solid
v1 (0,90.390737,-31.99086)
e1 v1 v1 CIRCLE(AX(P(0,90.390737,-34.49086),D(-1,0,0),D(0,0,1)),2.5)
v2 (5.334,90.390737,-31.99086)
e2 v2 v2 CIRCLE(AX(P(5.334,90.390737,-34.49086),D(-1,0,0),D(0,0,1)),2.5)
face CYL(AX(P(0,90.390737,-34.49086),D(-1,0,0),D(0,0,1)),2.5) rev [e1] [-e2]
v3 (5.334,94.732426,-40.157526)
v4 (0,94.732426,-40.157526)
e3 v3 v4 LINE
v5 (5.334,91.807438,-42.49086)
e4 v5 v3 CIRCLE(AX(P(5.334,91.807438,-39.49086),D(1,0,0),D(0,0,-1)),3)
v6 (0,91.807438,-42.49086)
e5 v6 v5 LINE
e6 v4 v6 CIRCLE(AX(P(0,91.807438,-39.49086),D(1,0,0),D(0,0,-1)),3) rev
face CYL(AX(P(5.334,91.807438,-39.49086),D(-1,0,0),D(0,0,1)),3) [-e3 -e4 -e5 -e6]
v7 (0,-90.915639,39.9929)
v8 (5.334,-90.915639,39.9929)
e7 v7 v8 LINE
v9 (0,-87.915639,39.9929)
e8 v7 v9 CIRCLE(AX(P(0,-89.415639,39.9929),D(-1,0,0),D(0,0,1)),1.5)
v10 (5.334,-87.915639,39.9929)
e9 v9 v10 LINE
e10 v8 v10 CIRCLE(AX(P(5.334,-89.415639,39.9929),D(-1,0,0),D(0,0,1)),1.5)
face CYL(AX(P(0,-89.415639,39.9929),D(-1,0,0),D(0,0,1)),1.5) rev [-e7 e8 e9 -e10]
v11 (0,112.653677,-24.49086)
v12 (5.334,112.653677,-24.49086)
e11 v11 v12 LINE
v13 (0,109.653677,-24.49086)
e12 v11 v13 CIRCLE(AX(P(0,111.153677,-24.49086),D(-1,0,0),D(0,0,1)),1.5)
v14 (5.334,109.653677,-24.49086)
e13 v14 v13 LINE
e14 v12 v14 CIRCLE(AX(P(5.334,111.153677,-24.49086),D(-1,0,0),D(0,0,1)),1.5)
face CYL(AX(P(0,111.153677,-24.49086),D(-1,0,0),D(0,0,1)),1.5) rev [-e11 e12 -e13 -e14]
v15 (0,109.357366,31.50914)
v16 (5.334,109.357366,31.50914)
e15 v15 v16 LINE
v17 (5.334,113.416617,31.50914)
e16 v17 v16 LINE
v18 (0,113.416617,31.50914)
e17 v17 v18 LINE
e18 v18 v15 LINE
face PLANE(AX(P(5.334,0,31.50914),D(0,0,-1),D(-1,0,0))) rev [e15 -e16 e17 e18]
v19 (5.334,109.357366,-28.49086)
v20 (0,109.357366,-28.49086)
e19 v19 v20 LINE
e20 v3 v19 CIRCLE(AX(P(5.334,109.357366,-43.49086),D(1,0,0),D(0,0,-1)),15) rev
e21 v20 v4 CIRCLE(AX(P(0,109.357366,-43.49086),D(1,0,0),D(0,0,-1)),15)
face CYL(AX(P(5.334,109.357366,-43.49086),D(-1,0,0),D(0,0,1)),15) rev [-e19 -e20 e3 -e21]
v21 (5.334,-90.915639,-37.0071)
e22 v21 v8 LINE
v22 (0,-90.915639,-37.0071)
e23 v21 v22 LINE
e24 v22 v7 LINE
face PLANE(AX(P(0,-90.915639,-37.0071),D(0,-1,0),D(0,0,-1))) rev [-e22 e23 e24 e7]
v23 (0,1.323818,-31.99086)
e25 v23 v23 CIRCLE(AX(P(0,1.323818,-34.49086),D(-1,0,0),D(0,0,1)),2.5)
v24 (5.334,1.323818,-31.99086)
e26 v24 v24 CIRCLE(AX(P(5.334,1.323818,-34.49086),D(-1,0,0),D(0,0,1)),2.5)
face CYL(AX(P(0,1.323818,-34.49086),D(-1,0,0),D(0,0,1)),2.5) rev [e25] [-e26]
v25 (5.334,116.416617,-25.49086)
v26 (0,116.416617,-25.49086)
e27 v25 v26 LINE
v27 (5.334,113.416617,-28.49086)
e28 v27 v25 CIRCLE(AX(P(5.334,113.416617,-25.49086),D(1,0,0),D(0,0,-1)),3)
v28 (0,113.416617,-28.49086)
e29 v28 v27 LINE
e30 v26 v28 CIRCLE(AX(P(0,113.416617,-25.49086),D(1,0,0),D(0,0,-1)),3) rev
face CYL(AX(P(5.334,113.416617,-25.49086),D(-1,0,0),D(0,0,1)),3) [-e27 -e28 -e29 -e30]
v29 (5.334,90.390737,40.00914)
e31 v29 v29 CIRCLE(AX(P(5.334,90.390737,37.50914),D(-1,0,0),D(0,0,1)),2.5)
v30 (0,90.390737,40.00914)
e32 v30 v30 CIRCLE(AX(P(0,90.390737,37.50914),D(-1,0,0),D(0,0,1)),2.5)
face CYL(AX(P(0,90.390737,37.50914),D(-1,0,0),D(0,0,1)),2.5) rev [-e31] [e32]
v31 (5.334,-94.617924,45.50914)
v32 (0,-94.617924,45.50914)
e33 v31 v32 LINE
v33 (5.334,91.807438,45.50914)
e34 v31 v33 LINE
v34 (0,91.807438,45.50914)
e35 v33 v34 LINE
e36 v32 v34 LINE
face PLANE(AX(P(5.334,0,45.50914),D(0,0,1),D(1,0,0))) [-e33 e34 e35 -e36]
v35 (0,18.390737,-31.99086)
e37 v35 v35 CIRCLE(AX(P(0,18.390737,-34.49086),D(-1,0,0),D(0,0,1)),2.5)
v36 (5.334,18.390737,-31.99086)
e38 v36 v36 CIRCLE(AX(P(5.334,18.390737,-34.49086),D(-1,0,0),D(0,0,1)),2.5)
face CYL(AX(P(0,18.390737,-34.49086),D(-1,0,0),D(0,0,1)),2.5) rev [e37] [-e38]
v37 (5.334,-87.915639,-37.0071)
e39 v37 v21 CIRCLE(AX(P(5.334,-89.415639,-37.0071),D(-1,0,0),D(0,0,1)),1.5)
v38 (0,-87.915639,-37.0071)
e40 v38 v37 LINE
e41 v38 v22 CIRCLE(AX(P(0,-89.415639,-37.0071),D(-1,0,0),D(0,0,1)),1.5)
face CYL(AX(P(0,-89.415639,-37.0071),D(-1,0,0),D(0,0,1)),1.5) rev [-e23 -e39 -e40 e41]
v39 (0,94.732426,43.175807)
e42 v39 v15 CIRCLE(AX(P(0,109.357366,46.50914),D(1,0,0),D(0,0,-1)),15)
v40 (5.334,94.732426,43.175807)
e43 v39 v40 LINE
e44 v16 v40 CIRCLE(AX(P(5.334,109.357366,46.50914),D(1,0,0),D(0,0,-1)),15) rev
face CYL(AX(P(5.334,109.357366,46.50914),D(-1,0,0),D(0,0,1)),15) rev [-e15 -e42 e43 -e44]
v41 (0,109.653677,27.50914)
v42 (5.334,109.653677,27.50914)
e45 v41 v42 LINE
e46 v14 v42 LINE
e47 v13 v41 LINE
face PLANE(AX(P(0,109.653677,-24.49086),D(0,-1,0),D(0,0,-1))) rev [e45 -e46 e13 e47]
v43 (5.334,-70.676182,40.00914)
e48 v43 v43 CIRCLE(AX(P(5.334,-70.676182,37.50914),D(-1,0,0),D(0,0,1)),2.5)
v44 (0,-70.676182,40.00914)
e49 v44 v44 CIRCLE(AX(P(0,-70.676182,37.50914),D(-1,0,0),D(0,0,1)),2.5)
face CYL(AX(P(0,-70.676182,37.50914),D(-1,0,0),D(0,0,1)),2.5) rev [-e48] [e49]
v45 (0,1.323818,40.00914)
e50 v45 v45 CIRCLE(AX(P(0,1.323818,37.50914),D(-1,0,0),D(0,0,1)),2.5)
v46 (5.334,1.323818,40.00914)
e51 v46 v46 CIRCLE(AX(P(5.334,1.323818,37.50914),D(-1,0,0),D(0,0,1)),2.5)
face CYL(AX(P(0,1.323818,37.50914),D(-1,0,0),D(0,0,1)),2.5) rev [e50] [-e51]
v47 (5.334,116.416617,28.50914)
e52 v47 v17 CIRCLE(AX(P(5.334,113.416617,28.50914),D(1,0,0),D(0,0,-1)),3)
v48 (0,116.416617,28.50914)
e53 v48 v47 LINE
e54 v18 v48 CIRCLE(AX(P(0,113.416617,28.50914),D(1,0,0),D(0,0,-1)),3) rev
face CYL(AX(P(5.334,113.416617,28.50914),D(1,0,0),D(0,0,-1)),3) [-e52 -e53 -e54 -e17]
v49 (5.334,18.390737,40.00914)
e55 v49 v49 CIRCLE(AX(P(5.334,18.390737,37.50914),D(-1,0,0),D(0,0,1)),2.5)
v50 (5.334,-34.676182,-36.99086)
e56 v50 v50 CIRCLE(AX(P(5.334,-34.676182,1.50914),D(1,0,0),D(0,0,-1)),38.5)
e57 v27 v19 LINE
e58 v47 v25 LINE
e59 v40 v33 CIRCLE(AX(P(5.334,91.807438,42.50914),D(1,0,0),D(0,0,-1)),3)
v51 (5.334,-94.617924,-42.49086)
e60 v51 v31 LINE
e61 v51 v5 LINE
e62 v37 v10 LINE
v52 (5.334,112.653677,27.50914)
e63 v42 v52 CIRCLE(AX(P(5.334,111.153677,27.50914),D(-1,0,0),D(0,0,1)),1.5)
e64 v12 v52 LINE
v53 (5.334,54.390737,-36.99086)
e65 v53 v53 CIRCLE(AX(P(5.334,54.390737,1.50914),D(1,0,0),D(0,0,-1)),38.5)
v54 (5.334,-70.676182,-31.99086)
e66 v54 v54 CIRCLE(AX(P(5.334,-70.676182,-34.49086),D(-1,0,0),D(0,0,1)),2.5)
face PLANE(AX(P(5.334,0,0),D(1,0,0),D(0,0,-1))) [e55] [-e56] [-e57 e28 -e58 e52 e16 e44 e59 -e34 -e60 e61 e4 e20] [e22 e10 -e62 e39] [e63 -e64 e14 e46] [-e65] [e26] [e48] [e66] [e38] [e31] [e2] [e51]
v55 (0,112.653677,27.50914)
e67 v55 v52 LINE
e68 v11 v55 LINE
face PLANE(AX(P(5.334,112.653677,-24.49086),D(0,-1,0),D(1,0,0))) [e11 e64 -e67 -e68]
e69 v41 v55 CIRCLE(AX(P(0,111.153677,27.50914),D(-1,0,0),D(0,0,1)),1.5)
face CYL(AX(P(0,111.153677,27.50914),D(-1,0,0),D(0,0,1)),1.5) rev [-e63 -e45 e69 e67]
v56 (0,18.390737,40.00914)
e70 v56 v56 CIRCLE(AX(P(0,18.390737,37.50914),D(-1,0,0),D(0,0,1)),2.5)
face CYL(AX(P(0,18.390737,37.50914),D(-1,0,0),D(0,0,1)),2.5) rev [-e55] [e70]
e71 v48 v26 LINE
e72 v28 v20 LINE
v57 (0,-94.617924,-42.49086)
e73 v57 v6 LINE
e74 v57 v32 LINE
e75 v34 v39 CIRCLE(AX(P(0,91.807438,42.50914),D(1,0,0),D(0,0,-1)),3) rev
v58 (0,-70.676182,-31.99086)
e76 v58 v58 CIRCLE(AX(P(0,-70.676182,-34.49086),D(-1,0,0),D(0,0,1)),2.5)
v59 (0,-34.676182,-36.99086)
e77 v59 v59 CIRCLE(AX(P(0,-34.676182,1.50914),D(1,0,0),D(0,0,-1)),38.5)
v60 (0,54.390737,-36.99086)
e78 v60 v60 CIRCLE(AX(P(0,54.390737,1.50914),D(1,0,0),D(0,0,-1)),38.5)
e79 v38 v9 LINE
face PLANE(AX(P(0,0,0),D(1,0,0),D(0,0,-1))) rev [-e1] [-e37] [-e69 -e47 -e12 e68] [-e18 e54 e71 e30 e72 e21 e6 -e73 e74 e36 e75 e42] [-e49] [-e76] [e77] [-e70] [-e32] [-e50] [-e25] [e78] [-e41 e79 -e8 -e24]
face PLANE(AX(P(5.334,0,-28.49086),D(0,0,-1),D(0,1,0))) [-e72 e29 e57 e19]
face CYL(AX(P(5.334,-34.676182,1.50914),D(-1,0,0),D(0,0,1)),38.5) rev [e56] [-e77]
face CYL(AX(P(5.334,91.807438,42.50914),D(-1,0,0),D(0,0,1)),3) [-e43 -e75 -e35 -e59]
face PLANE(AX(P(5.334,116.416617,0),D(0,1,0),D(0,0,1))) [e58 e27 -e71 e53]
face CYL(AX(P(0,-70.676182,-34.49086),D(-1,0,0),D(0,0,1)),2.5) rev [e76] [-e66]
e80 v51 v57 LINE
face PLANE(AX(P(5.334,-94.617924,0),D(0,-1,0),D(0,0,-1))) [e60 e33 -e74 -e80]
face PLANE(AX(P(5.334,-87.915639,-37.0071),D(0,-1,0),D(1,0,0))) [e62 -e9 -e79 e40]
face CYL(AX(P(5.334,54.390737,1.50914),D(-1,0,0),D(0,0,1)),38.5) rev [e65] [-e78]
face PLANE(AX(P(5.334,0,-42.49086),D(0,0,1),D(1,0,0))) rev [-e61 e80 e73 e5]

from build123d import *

# Parameters (mm, degrees)
SKETCH2_R                 = 38.5
SKETCH2_W                 = 4
SKETCH2_H                 = 189.008661332
BOSS_EXTRUDE2_DEPTH       = 5.334
F_3_0MM_DOWEL_SLOT1_DEPTH = 5.334
F_3_0MM_DOWEL_SLOT2_DEPTH = 5.334
FILLET1_R                 = 15
FILLET2_R                 = 3
F_5_0MM_DOWEL_HOLE1_D     = 5


# Read off the part's stored shape, not the designer's step: Ø3.0mm Dowel Slot1, Ø3.0mm Dowel Slot2
with BuildPart() as part:
    # Sketch2 → Boss-Extrude2 (new body)
    # profile 1 of 3: a face of its own
    with BuildSketch(Plane(origin=(0, 0, 0), x_dir=(0, 0, -1), z_dir=(1, 0, 0))):
        Polygon((28.490859753, 116.416616863), (28.490859753, 94.390736923), (38.490859753, 94.390736923), (38.490859753, -94.617924409), (-41.509140247, -94.617924409), (-41.509140247, 94.390736923), (-31.509140247, 94.390736923), (-31.509140247, 116.416616863), align=None)
        with Locations((-1.509140247, 54.390736923)):
            Circle(SKETCH2_R, mode=Mode.SUBTRACT)
        with Locations((-1.509140247, -34.676182382)):
            Circle(SKETCH2_R, mode=Mode.SUBTRACT)
    # profile 2 of 3: a face of its own
    with BuildSketch(Plane(origin=(0, 0, 0), x_dir=(0, 0, -1), z_dir=(1, 0, 0))):
        with Locations((-43.509140247, -0.113593743)):
            Rectangle(SKETCH2_W, SKETCH2_H)
    # profile 3 of 3: a face of its own
    with BuildSketch(Plane(origin=(0, 0, 0), x_dir=(0, 0, -1), z_dir=(1, 0, 0))):
        with Locations((40.490859753, -0.113593743)):
            Rectangle(SKETCH2_W, SKETCH2_H)
    extrude(amount=BOSS_EXTRUDE2_DEPTH)

    # Ø3.0mm Dowel Slot1 outline → Ø3.0mm Dowel Slot1 (cut)
    with BuildSketch(Plane.YZ):
        with BuildLine():
            ThreePointArc((-87.91563933, 39.992900247), (-89.41563933, 41.492900247), (-90.91563933, 39.992900247))
            Line((-90.91563933, 39.992900247), (-90.91563933, -37.007099753))
            ThreePointArc((-90.91563933, -37.007099753), (-89.41563933, -38.507099753), (-87.91563933, -37.007099753))
            Line((-87.91563933, -37.007099753), (-87.91563933, 39.992900247))
        make_face()
    extrude(amount=F_3_0MM_DOWEL_SLOT1_DEPTH, mode=Mode.SUBTRACT)

    # Ø3.0mm Dowel Slot2 outline → Ø3.0mm Dowel Slot2 (cut)
    with BuildSketch(Plane.YZ):
        with BuildLine():
            ThreePointArc((112.653676893, 27.509140247), (111.153676893, 29.009140247), (109.653676893, 27.509140247))
            Line((109.653676893, 27.509140247), (109.653676893, -24.490859753))
            ThreePointArc((109.653676893, -24.490859753), (111.153676893, -25.990859753), (112.653676893, -24.490859753))
            Line((112.653676893, -24.490859753), (112.653676893, 27.509140247))
        make_face()
    extrude(amount=F_3_0MM_DOWEL_SLOT2_DEPTH, mode=Mode.SUBTRACT)

    # Fillet1
    # the kernel refuses this fillet: 15 mm, written as the material it adds along each edge
    with BuildSketch(Plane(origin=(0, 94.390736923, 31.509140247), x_dir=(0, 1, 0), z_dir=(1, 0, 0))) as fillet1_piece_1:
        with BuildLine():
            CenterArc((14.966629547, 15), FILLET1_R, 183.822553729, 86.177446271)
            Line((0, 14), (-0.299332591, 13.98))
            ThreePointArc((-0.299332591, 13.98), (-0.3, 7), (-0.3, 0))
            Line((-0.3, 0), (0, -0.3))
            Line((0, -0.3), (14.966629547, -0.3))
            Line((14.966629547, -0.3), (14.966629547, 0))
        make_face()
    extrude(amount=5.334)
    with BuildSketch(Plane(origin=(0, 94.390736923, -28.490859753), x_dir=(0, 1, 0), z_dir=(1, 0, 0))) as fillet1_piece_2:
        with BuildLine():
            CenterArc((14.966629547, -15), FILLET1_R, 90, 86.177446271)
            Line((0, -14), (-0.299332591, -13.98))
            ThreePointArc((-0.299332591, -13.98), (-0.3, -7), (-0.3, 0))
            Line((-0.3, 0), (0, 0.3))
            Line((0, 0.3), (14.966629547, 0.3))
            Line((14.966629547, 0.3), (14.966629547, 0))
        make_face()
    extrude(amount=5.334)

    # Fillet2
    fillet2_edges = [part.edges().sort_by_distance(p)[0] for p in [
        (2.667, 94.390736923, -42.490859753),
        (2.667, 94.390736923, 45.509140247),
        (2.667, 116.416616863, 31.509140247),
        (2.667, 116.416616863, -28.490859753),
    ]]
    fillet(fillet2_edges, radius=FILLET2_R)

    # Ø5.0mm Dowel Hole1 (through all)
    with Locations(Plane.ZY):
        with Locations((-34.490859753, 90.390736923), (37.509140247, 90.390736923), (-34.490859753, 18.390736923), (37.509140247, 18.390736923), (37.509140247, 1.323817618), (-34.490859753, 1.323817618), (-34.490859753, -70.676182382), (37.509140247, -70.676182382)):
            Hole(F_5_0MM_DOWEL_HOLE1_D / 2)


solid = part.part
